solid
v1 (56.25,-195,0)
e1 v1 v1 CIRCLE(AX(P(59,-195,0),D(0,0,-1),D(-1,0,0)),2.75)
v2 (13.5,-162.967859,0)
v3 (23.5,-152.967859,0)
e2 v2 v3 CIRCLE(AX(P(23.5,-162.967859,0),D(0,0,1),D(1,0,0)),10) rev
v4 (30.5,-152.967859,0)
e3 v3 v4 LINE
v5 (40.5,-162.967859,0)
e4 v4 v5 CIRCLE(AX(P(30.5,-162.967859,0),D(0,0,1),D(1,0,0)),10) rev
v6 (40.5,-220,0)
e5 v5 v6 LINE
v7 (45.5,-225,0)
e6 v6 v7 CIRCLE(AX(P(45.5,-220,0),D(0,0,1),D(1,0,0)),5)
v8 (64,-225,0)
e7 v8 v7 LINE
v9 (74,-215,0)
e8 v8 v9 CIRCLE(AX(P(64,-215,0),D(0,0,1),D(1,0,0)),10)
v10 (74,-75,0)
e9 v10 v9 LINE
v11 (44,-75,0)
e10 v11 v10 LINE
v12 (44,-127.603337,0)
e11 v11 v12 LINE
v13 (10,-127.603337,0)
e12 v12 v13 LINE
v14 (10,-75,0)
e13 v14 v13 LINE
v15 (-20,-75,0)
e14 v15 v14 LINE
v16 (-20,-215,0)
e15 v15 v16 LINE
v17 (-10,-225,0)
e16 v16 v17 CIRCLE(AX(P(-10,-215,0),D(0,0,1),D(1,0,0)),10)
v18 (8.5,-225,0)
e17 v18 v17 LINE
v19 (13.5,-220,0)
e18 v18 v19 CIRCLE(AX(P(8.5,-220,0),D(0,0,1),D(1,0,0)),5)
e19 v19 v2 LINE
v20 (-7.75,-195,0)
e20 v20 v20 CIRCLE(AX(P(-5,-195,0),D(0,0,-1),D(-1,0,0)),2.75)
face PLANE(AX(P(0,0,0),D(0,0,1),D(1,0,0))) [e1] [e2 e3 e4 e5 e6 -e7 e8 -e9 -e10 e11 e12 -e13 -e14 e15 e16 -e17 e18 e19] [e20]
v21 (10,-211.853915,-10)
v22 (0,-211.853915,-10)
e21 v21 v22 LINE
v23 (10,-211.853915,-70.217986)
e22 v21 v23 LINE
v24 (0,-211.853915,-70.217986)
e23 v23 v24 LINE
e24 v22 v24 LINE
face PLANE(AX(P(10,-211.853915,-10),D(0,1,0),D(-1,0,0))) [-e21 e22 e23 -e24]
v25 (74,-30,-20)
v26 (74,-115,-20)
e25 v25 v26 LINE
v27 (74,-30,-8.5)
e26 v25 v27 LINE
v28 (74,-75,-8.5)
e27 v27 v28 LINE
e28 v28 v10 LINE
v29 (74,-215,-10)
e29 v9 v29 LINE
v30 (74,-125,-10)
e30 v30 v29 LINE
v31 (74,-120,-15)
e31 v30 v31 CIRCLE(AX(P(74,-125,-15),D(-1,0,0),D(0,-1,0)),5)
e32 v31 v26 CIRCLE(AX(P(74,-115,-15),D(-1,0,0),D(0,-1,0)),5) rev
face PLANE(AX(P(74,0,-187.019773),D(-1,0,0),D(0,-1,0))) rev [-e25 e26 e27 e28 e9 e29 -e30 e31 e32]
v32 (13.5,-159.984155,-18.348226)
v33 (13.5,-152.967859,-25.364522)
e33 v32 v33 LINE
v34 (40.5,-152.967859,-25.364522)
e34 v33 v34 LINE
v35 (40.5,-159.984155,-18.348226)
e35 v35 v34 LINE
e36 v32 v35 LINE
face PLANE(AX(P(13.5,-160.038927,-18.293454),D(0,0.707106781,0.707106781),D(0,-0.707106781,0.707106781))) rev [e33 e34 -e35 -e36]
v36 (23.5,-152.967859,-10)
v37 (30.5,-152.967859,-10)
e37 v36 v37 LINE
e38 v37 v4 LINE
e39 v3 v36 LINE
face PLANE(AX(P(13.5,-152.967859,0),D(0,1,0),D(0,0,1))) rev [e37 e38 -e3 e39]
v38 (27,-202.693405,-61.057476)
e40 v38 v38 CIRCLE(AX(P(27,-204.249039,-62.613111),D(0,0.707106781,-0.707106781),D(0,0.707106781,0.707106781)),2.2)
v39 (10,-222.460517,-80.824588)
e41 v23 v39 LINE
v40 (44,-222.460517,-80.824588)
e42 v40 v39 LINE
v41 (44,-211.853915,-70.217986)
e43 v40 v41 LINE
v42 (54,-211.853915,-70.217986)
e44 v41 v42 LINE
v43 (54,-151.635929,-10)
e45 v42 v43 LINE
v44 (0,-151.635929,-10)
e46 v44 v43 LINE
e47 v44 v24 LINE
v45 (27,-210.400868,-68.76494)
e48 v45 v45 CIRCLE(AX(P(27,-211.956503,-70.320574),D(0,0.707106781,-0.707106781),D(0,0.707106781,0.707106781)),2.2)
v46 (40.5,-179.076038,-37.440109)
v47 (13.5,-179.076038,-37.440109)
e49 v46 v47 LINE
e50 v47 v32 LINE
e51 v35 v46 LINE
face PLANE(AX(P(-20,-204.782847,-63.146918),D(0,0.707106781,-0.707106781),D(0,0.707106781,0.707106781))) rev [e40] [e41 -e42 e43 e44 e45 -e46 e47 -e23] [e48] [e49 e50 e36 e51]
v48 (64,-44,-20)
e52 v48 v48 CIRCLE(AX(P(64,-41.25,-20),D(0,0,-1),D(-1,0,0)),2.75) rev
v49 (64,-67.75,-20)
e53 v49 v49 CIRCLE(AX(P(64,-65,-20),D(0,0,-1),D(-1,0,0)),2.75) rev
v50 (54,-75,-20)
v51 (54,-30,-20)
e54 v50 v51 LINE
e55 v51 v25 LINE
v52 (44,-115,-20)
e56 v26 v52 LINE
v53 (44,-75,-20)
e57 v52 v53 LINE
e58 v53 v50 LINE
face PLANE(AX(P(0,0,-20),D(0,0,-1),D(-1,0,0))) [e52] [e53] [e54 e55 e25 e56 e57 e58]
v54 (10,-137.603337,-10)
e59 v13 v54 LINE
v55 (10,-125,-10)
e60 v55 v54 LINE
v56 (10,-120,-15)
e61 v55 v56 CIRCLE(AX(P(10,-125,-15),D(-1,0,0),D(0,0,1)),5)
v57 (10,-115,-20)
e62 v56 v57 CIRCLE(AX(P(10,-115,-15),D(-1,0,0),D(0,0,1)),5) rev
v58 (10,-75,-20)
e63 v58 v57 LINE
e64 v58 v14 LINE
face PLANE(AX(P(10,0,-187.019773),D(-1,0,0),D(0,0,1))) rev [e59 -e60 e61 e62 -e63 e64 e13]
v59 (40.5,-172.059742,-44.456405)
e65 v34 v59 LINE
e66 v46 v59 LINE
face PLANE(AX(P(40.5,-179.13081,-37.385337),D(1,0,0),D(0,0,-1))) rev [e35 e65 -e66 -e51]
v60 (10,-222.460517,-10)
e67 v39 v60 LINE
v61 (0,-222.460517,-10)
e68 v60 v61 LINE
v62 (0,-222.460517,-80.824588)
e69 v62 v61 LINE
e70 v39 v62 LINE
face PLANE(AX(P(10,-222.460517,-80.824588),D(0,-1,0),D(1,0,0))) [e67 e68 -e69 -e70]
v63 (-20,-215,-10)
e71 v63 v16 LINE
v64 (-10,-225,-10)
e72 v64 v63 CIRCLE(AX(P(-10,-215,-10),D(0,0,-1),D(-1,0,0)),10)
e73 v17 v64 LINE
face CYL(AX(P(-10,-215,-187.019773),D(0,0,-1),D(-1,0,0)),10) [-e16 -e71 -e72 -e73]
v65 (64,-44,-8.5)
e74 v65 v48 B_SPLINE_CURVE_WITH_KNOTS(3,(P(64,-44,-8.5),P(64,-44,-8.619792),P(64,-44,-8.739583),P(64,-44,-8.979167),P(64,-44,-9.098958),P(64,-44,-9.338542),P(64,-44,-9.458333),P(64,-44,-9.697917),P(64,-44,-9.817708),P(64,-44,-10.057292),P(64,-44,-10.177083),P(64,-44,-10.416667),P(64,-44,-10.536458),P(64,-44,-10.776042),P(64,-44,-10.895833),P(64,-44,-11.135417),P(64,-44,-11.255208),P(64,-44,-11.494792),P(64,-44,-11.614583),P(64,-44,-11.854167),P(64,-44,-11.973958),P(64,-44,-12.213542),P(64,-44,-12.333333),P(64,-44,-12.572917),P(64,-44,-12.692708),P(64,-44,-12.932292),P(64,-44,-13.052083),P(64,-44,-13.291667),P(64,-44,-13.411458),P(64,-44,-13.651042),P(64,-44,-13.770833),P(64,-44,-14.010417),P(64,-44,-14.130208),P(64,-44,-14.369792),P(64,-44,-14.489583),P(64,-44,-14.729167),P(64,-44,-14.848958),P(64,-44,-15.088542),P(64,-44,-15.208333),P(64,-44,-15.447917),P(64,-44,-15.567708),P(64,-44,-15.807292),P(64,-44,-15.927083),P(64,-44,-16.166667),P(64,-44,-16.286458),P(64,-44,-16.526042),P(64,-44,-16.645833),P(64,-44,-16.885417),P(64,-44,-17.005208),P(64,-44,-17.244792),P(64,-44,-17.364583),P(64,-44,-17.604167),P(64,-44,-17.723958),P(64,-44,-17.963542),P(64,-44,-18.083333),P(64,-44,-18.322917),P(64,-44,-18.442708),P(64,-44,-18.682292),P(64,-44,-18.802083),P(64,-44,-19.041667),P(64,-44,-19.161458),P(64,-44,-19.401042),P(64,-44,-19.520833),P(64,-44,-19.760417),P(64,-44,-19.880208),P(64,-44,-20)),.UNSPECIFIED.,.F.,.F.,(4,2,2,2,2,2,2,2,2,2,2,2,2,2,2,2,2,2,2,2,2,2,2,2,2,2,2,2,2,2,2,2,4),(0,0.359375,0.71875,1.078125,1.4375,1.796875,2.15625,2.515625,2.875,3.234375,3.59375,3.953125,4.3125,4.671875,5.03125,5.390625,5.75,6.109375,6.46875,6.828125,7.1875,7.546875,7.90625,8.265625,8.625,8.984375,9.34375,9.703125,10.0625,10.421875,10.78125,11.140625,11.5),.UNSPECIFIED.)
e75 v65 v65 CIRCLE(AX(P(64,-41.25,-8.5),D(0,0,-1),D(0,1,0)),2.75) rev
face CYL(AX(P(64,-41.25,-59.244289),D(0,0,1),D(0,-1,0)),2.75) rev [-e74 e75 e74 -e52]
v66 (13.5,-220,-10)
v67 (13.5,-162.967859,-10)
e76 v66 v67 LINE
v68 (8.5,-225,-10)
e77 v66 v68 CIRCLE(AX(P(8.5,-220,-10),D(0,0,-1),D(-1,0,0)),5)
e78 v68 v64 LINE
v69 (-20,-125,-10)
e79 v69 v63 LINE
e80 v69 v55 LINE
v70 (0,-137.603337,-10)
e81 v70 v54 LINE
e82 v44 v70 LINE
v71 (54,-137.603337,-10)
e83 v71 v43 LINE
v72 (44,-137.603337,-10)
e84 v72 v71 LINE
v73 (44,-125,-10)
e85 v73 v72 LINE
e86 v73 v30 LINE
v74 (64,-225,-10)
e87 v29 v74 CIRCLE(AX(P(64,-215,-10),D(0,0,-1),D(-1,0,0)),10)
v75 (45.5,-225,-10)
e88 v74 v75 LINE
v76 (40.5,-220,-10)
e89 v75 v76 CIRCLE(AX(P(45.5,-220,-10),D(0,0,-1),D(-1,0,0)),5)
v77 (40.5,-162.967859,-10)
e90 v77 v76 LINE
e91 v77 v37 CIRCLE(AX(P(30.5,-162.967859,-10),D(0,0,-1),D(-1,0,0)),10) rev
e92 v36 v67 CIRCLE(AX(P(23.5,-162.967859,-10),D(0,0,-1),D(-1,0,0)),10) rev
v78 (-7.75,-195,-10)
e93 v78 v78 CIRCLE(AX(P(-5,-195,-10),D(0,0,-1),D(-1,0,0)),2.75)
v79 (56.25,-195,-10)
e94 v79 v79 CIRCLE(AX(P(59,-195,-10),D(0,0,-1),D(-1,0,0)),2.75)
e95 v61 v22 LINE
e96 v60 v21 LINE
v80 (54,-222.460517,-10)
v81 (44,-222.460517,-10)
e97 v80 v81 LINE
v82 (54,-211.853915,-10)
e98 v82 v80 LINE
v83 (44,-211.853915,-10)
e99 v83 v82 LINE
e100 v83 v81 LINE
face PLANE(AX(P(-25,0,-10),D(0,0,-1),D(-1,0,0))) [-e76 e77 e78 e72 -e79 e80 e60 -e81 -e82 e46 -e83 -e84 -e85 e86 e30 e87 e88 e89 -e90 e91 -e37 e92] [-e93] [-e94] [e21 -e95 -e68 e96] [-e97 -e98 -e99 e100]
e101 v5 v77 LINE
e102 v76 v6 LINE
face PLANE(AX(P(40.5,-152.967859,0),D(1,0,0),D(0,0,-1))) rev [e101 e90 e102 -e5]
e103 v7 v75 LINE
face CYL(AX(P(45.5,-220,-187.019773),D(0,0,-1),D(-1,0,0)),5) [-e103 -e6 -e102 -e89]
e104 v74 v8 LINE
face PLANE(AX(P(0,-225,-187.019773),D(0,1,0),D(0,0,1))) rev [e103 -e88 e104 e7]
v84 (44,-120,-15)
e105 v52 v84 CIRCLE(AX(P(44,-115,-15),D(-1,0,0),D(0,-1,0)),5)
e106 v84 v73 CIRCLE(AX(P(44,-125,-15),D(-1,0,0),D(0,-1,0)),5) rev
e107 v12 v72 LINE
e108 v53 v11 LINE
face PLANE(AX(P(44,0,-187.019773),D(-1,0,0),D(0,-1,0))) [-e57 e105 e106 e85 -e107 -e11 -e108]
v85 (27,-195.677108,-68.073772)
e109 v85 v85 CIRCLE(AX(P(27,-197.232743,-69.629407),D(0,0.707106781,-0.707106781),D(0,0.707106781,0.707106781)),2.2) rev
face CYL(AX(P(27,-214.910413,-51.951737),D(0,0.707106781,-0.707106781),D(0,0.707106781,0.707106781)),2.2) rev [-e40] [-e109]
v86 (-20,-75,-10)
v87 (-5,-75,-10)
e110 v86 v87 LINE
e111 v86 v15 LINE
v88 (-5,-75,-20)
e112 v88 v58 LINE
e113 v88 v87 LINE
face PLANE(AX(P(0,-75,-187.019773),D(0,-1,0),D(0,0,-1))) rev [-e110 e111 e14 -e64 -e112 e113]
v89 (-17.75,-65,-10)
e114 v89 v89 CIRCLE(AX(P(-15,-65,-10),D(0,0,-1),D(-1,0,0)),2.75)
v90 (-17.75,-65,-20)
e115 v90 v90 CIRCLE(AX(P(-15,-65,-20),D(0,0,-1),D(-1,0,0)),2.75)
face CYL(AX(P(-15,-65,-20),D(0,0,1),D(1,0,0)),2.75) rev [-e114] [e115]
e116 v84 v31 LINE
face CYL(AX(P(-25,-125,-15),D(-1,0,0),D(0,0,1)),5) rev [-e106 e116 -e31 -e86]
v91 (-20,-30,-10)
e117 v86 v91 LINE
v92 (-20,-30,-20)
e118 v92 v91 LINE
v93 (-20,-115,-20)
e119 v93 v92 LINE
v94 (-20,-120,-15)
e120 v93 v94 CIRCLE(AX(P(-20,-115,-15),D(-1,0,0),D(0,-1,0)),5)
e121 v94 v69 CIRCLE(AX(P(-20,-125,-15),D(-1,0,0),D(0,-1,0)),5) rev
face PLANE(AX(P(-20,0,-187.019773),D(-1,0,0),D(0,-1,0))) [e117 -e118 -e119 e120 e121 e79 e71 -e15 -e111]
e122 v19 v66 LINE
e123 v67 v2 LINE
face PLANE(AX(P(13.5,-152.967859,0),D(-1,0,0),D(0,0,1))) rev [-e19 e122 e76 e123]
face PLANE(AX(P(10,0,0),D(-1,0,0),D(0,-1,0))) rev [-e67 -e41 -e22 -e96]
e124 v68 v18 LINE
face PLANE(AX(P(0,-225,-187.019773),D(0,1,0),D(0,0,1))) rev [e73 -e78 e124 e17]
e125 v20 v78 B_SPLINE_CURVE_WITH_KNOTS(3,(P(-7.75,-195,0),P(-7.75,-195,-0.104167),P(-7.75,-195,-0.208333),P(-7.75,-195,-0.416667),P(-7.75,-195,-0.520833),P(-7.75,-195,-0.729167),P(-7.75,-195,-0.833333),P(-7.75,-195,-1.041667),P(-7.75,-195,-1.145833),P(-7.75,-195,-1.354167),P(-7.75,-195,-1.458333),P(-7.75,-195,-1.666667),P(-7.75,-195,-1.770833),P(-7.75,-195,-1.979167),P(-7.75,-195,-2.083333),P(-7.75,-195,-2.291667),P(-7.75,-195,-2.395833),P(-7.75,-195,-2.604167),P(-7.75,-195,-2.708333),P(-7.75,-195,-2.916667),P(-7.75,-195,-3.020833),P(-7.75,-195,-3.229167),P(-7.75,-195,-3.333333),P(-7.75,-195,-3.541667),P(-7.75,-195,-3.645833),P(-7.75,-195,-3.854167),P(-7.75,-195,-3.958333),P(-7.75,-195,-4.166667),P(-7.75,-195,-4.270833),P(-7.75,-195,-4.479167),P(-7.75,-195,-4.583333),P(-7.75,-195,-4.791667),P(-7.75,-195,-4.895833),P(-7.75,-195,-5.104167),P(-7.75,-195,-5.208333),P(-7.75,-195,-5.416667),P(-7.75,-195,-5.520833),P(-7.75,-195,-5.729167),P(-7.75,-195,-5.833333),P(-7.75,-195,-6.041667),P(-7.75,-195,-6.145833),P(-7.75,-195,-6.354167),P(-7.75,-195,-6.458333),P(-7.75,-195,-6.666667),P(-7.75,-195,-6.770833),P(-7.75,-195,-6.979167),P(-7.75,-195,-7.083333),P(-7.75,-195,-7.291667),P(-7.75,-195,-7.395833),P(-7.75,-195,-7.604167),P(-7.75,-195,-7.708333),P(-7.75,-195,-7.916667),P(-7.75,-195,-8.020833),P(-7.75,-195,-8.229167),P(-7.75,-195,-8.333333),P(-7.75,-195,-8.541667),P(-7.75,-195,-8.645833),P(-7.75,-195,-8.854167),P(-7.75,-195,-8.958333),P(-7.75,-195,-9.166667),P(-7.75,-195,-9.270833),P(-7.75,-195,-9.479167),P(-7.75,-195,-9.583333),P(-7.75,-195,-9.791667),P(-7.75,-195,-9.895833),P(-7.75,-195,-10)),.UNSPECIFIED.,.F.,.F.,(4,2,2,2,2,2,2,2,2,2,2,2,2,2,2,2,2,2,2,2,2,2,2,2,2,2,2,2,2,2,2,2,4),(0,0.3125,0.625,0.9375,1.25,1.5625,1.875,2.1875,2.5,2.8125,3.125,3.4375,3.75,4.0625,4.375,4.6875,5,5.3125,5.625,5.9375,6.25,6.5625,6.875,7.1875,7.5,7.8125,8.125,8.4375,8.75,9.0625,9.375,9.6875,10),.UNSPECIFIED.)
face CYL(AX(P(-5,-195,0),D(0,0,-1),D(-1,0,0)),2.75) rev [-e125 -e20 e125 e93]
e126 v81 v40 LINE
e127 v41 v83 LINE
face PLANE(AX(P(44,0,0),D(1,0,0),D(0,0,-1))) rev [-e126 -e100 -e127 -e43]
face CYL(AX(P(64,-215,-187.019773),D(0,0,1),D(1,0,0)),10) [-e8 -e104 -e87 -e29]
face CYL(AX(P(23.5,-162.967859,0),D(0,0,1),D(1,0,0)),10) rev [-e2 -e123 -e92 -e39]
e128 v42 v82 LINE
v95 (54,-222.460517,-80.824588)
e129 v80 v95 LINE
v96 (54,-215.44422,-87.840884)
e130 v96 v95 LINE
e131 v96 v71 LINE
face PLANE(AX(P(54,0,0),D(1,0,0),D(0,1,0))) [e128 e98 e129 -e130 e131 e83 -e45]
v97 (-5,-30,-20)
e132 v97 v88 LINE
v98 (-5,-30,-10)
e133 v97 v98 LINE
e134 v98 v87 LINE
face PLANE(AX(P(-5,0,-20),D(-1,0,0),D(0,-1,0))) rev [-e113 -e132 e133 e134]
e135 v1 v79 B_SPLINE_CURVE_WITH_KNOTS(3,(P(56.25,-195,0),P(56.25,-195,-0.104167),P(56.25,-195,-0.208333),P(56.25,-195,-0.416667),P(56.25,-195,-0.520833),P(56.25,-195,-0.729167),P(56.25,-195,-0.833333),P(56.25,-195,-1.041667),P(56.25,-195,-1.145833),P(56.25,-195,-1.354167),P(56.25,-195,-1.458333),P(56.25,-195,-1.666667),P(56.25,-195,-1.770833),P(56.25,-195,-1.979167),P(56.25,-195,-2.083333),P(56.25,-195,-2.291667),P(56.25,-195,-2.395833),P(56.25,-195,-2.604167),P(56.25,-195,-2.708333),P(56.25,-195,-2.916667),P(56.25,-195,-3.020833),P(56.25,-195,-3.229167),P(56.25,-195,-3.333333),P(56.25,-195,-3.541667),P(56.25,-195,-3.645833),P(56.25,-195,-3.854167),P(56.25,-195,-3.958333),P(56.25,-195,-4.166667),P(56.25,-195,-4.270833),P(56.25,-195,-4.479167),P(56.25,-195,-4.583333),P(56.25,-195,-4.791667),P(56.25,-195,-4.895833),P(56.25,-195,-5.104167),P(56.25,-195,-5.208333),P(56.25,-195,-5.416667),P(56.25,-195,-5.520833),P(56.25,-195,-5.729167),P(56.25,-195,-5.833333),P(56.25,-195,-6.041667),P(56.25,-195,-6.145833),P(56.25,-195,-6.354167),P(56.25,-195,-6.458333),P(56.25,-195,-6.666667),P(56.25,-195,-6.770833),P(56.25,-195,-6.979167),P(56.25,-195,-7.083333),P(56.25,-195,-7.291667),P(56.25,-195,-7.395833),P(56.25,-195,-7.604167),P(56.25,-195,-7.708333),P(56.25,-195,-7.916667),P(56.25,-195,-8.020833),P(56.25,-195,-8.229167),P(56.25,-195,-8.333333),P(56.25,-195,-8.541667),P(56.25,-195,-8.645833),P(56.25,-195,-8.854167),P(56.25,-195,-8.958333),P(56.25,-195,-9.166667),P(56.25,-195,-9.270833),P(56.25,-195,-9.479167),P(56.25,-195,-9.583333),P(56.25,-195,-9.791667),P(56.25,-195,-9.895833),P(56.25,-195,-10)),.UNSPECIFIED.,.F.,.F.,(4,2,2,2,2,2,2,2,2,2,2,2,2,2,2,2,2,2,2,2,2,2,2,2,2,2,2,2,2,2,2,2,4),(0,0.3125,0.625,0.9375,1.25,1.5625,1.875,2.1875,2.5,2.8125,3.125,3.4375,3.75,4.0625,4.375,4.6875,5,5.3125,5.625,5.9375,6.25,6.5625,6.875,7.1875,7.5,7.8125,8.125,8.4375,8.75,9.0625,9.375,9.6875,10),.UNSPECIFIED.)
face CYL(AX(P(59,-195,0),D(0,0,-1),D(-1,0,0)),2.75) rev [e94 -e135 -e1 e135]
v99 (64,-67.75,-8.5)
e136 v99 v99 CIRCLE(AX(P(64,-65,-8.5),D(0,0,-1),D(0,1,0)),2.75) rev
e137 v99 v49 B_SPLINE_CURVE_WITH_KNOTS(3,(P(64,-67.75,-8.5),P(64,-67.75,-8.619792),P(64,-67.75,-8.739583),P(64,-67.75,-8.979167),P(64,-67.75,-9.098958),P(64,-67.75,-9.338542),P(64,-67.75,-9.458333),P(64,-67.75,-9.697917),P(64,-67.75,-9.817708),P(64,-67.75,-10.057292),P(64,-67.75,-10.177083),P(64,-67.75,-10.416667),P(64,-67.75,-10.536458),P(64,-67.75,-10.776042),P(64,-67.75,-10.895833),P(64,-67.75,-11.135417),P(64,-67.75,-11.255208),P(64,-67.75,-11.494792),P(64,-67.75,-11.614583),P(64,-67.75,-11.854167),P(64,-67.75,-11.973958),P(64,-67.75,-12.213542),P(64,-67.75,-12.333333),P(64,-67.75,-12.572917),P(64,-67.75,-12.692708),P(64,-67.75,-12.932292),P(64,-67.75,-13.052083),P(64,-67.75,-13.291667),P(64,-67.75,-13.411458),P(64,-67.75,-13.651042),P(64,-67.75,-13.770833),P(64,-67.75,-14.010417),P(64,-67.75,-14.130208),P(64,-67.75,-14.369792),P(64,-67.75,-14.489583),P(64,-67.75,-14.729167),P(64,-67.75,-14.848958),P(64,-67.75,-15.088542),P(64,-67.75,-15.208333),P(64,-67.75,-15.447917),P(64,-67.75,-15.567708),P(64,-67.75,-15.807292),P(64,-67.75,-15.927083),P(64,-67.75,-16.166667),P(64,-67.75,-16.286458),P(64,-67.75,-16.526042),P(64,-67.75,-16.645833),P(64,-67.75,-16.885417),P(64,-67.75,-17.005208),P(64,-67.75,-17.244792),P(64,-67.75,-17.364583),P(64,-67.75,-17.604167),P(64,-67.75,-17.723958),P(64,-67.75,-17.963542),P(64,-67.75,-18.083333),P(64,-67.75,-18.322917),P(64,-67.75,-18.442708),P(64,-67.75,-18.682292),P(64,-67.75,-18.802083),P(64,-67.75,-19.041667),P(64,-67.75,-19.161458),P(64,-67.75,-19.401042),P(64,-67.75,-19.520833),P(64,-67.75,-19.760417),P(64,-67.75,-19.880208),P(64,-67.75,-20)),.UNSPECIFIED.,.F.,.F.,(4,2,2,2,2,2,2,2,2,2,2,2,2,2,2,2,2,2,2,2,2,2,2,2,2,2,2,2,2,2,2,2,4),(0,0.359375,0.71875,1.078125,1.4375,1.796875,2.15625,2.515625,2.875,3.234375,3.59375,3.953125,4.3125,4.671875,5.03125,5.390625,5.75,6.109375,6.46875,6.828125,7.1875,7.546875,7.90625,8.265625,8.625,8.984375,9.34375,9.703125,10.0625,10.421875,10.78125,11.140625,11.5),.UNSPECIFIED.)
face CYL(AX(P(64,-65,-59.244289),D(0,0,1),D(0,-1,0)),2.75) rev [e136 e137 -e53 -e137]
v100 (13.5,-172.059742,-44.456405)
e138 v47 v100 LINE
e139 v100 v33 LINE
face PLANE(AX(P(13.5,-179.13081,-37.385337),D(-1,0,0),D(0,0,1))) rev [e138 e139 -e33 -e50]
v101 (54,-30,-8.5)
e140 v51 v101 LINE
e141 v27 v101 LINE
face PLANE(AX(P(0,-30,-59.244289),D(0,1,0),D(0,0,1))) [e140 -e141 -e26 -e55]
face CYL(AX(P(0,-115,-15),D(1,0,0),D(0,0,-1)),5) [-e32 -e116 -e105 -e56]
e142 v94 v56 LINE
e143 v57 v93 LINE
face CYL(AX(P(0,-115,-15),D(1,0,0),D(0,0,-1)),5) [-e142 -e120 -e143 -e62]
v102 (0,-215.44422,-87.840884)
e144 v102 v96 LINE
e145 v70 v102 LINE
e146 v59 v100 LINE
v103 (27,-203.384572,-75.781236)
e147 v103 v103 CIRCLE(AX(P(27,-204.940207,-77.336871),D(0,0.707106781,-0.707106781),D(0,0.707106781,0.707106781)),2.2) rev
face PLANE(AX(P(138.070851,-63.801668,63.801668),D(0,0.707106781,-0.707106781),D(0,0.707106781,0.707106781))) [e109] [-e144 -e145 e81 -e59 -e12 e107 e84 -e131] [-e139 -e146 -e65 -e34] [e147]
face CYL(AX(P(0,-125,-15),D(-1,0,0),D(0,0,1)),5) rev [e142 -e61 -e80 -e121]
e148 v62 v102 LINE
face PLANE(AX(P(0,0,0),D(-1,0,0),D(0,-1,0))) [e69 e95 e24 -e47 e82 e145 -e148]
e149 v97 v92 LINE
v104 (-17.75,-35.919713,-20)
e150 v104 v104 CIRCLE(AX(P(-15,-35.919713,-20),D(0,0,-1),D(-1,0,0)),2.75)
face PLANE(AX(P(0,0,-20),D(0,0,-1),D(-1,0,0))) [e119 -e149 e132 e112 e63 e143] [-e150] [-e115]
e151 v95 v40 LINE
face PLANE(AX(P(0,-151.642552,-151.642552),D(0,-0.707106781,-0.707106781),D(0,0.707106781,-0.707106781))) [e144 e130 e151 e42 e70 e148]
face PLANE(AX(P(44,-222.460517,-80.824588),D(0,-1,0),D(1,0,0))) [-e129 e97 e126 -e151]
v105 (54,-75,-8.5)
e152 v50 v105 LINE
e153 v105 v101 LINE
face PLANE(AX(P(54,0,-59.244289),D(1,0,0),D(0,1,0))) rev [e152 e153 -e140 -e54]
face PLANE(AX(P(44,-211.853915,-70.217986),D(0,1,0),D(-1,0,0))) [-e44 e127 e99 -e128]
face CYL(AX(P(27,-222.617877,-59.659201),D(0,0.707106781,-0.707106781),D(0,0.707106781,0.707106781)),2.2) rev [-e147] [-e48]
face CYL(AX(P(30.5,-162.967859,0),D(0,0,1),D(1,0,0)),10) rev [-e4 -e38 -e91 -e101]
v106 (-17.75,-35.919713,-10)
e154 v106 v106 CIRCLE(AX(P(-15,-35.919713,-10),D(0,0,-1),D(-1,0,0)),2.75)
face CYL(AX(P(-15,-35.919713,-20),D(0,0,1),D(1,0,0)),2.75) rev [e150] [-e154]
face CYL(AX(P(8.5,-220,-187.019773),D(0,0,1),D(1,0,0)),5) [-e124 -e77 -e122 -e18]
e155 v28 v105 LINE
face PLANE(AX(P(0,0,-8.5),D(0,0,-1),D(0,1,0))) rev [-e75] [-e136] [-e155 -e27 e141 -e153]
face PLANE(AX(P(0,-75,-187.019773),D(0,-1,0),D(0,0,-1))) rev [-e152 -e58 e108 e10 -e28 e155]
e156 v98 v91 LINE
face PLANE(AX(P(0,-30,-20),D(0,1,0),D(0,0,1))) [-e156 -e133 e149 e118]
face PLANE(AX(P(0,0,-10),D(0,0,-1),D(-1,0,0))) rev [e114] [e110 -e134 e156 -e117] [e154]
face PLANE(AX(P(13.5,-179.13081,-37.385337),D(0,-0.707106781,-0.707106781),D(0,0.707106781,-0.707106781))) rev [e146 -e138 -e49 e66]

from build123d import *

# Parameters (mm, degrees)
SKETCH2_W               = 34
SKETCH2_H               = 20
SKETCH2_W_2             = 30
SKETCH2_H_2             = 150
BOSS_EXTRUDE1_DEPTH     = 10
SKETCH3_W               = 20
SKETCH3_H               = 45
SKETCH3_R               = 2.75
BOSS_EXTRUDE2_DEPTH     = 1.5
SKETCH4_W               = 15
SKETCH4_H               = 45
SKETCH4_R               = 2.75
BOSS_EXTRUDE3_DEPTH     = 10
SKETCH5_R               = 2.75
BOSS_EXTRUDE4_DEPTH     = 10
FILLET1_R               = 5
SKETCH6_W               = 34
SKETCH6_H               = 10
BOSS_EXTRUDE5_DEPTH     = 70
BOSS_EXTRUDE6_REACH     = 246.665
CUT_EXTRUDE1_DEPTH      = 34
FILLET2_R               = 5
CUT_EXTRUDE2_START      = -20
CUT_EXTRUDE2_DEPTH      = 20
CUT_EXTRUDE3_DEPTH      = 20
BOSS_EXTRUDE7_DEPTH     = 54
CUT_EXTRUDE4_DEPTH      = 240.922546822
CUT_EXTRUDE4_DEPTH_BACK = 240.922546822
CUT_EXTRUDE5_DEPTH      = 240.922546822
CUT_EXTRUDE5_DEPTH_BACK = 240.922546822
BOSS_EXTRUDE8_DEPTH     = 54
CUT_EXTRUDE6_DEPTH      = 248.030112784
CUT_EXTRUDE6_DEPTH_BACK = 248.030112784
SKETCH18_R              = 2.2
CUT_EXTRUDE7_DEPTH      = 9.92254106
SKETCH20_W              = 54
SKETCH20_H              = 9.922541059
BOSS_EXTRUDE9_DEPTH     = 25
SKETCH21_R              = 2.2
CUT_EXTRUDE8_DEPTH      = 25
BOSS_EXTRUDE10_START    = 13
SKETCH22_R              = 2.2
BOSS_EXTRUDE10_DEPTH    = 13
SKETCH23_W              = 13
SKETCH23_H              = 77.7
CUT_EXTRUDE10_DEPTH     = 13
SKETCH24_W              = 27
SKETCH24_H              = 27
CUT_EXTRUDE11_DEPTH     = 10
CUT_EXTRUDE12_DEPTH     = 10
BOSS_EXTRUDE11_DEPTH    = 10
BOSS_EXTRUDE12_DEPTH    = 10
FILLET3_R               = 10
FILLET4_R               = 5
FILLET5_R               = 10
CUT_EXTRUDE14_DEPTH     = 250.319480135


with BuildPart() as part:
    # Sketch2 → Boss-Extrude1 (new body)
    with BuildSketch(Plane.XY):
        Polygon((10, -225), (10, -205), (10, -75), (-20, -75), (-20, -225), align=None)
        with Locations((27, -215)):
            Rectangle(SKETCH2_W, SKETCH2_H)
        with Locations((59, -150)):
            Rectangle(SKETCH2_W_2, SKETCH2_H_2)
    extrude(amount=-BOSS_EXTRUDE1_DEPTH)

    # Sketch3 → Boss-Extrude2 (add)
    with BuildSketch(Plane(origin=(0, 0, -8.5), x_dir=(-1, 0, 0), z_dir=(0, 0, -1))):
        with Locations((-64, -52.5)):
            Rectangle(SKETCH3_W, SKETCH3_H)
        with Locations((-64, -65)):
            Circle(SKETCH3_R, mode=Mode.SUBTRACT)
        with Locations((-64, -41.25)):
            Circle(SKETCH3_R, mode=Mode.SUBTRACT)
    extrude(amount=BOSS_EXTRUDE2_DEPTH)

    # Sketch4 → Boss-Extrude3 (add)
    # profile 1 of 2: a face of its own
    with BuildSketch(Plane(origin=(0, 0, -10), x_dir=(-1, 0, 0), z_dir=(0, 0, -1))):
        Polygon((20, -75), (5, -75), (-10, -75), (-10, -120), (20, -120), align=None)
    # profile 2 of 2: a face of its own
    with BuildSketch(Plane(origin=(0, 0, -10), x_dir=(-1, 0, 0), z_dir=(0, 0, -1))):
        with Locations((12.5, -52.5)):
            Rectangle(SKETCH4_W, SKETCH4_H)
        with Locations((15, -65)):
            Circle(SKETCH4_R, mode=Mode.SUBTRACT)
        with Locations((15, -35.919713403)):
            Circle(SKETCH4_R, mode=Mode.SUBTRACT)
    extrude(amount=BOSS_EXTRUDE3_DEPTH)

    # Sketch5 → Boss-Extrude4 (add)
    with BuildSketch(Plane(origin=(0, 0, -10), x_dir=(-1, 0, 0), z_dir=(0, 0, -1))):
        Polygon((-74, -120), (-44, -120), (-44, -75), (-54, -75), (-54, -30), (-74, -30), align=None)
        with Locations(Location((-64, -65, 0), (0, 0, 270))):
            Circle(SKETCH5_R, mode=Mode.SUBTRACT)
        with Locations(Location((-64, -41.25, 0), (0, 0, 270))):
            Circle(SKETCH5_R, mode=Mode.SUBTRACT)
    extrude(amount=BOSS_EXTRUDE4_DEPTH)

    # Fillet1
    fillet1_edges = [part.edges().sort_by_distance(p)[0] for p in [
        (59, -120, -10),
        (-5, -120, -10),
    ]]
    fillet(fillet1_edges, radius=FILLET1_R)
    fillet1_2_edges = [part.edges().sort_by_distance(p)[0] for p in [
        (59, -120, -20),
        (-5, -120, -20),
    ]]
    fillet(fillet1_2_edges, radius=FILLET1_R - 0.0001)  # a hair under: the kernel refuses the full size

    # Sketch6 → Boss-Extrude5 (add)
    with BuildSketch(Plane(origin=(0, -205, 0), x_dir=(1, 0, 0), z_dir=(0, 1, 0))):
        with Locations((27, 5)):
            Rectangle(SKETCH6_W, SKETCH6_H)
    extrude(amount=BOSS_EXTRUDE5_DEPTH)

    # Boss-Extrude6: up to this face of the body (flat: up to its plane)
    boss_extrude6_end = Plane(part.part.faces().sort_by_distance((74, -119.982060157, -8.746792457))[0])
    # Sketch7 → Boss-Extrude6 (add, up to the picked face)
    with BuildSketch(Plane.ZY.offset(20), mode=Mode.PRIVATE) as boss_extrude6_sk1:
        Polygon((-10, -137.603336753), (-34.698331624, -162.301668376), (-45.304933341, -172.908270094), (-10, -172.908270094), align=None)
    boss_extrude6_tool1 = split(extrude(boss_extrude6_sk1.sketch, amount=-BOSS_EXTRUDE6_REACH, mode=Mode.PRIVATE), bisect_by=boss_extrude6_end, keep=Keep.BOTH, mode=Mode.PRIVATE)
    # Sketch7 → Boss-Extrude6 (add, up to the picked face)
    with BuildSketch(Plane.ZY.offset(20), mode=Mode.PRIVATE) as boss_extrude6_sk2:
        Polygon((0, -127.603336753), (-10, -137.603336753), (-10, -172.908270094), (0, -172.908270094), align=None)
    boss_extrude6_tool2 = split(extrude(boss_extrude6_sk2.sketch, amount=-BOSS_EXTRUDE6_REACH, mode=Mode.PRIVATE), bisect_by=boss_extrude6_end, keep=Keep.BOTH, mode=Mode.PRIVATE)
    add(boss_extrude6_tool1.solids().sort_by(Axis((-20, -161.139959, -21.768311), (1, 0, 0)))[0])
    add(boss_extrude6_tool2.solids().sort_by(Axis((-20, -152.652425, -4.793243), (1, 0, 0)))[0])

    # Sketch8 → Cut-Extrude1 (cut)
    with BuildSketch(Plane.ZY.offset(-44)):
        Polygon((-7.396663247, -135), (-10.086941063, -137.690277816), (-10, -135), align=None)
    extrude(amount=CUT_EXTRUDE1_DEPTH, mode=Mode.SUBTRACT)

    # Fillet2
    fillet2_edges = [part.edges().sort_by_distance(p)[0] for p in [
        (27, -172.908270094, -45.304933341),
    ]]
    fillet(fillet2_edges, radius=FILLET2_R)

    # Sketch9 → Cut-Extrude2 (cut)
    with BuildSketch(Plane.ZY.offset(20).offset(CUT_EXTRUDE2_START)):
        with BuildLine():
            Line((-10, -172.908270094), (-10, -137.603336753))
            Line((-10, -137.603336753), (-36.769399436, -164.372736188))
            ThreePointArc((-36.769399436, -164.372736188), (-37.853263192, -169.821687256), (-33.23386553, -172.908270094))
            Line((-33.23386553, -172.908270094), (-10, -172.908270094))
        make_face()
    extrude(amount=CUT_EXTRUDE2_DEPTH, mode=Mode.SUBTRACT)

    # Sketch10 → Cut-Extrude3 (cut)
    with BuildSketch(Plane(origin=(74, 0, 0), x_dir=(0, 0, -1), z_dir=(1, 0, 0))):
        with BuildLine():
            Line((10, -137.603336753), (10, -172.908270094))
            Line((10, -172.908270094), (33.23386553, -172.908270094))
            ThreePointArc((33.23386553, -172.908270094), (37.853263192, -169.821687256), (36.769399436, -164.372736188))
            Line((36.769399436, -164.372736188), (10, -137.603336753))
        make_face()
    extrude(amount=-CUT_EXTRUDE3_DEPTH, mode=Mode.SUBTRACT)

    # Sketch12 → Boss-Extrude7 (add)
    with BuildSketch(Plane.ZY):
        Polygon((-10, -137.603336753), (22.716423027, -106.706157847), (36.44850254, -121.246790303), (-10, -165.112456538), align=None)
    extrude(amount=-BOSS_EXTRUDE7_DEPTH)

    # Sketch13 → Cut-Extrude4 (cut, two sides: drawn at the far end of the back side and taken through both)
    with BuildSketch(Plane(origin=(54, 0, 0), x_dir=(0, 0, -1), z_dir=(1, 0, 0)).offset(-CUT_EXTRUDE4_DEPTH_BACK)):
        Polygon((17.239749062, -172.908270094), (10, -165.668521032), (10, -172.908270094), align=None)
    extrude(amount=CUT_EXTRUDE4_DEPTH + CUT_EXTRUDE4_DEPTH_BACK, mode=Mode.SUBTRACT)

    # Sketch14 → Cut-Extrude5 (cut, two sides: drawn at the far end of the back side and taken through both)
    with BuildSketch(Plane(origin=(54, 0, 0), x_dir=(0, 0, -1), z_dir=(1, 0, 0)).offset(-CUT_EXTRUDE5_DEPTH_BACK)):
        Polygon((-36.44850254, -121.246790303), (0, -155.668521032), (0, -128.159401246), (-22.716423027, -106.706157847), align=None)
    extrude(amount=CUT_EXTRUDE5_DEPTH + CUT_EXTRUDE5_DEPTH_BACK, mode=Mode.SUBTRACT)

    # Sketch15 → Boss-Extrude8 (add)
    with BuildSketch(Plane(origin=(54, 0, 0), x_dir=(0, 0, -1), z_dir=(1, 0, 0))):
        with BuildLine():
            Line((17.239749062, -172.908270094), (56.130622027, -211.799143059))
            Line((56.130622027, -211.799143059), (70.163214167, -197.76655092))
            Line((70.163214167, -197.76655092), (36.769399436, -164.372736188))
            ThreePointArc((36.769399436, -164.372736188), (37.853263192, -169.821687256), (33.23386553, -172.908270094))
            Line((33.23386553, -172.908270094), (17.239749062, -172.908270094))
        make_face()
    extrude(amount=-BOSS_EXTRUDE8_DEPTH)

    # Sketch16 → Cut-Extrude6 (cut, two sides: drawn at the far end of the back side and taken through both)
    with BuildSketch(Plane(origin=(54, 0, 0), x_dir=(0, 0, -1), z_dir=(1, 0, 0)).offset(-CUT_EXTRUDE6_DEPTH_BACK)):
        Polygon((63.146918097, -204.78284699), (10, -151.635928892), (10, -165.668521032), (56.130622027, -211.799143059), align=None)
    extrude(amount=CUT_EXTRUDE6_DEPTH + CUT_EXTRUDE6_DEPTH_BACK, mode=Mode.SUBTRACT)

    # Sketch18 → Cut-Extrude7 (cut)
    with BuildSketch(Plane(origin=(0, -63.801668376, 63.801668376), x_dir=(1, 0, 0), z_dir=(0, 0.707106781186546, -0.7071067811865491))):
        with Locations(Location((27, 144.300035894, 0), (0, 0, 270))):
            Circle(SKETCH18_R)
        with Locations(Location((27, 134.300035894, 0), (0, 0, 270))):
            Circle(SKETCH18_R)
    extrude(amount=-CUT_EXTRUDE7_DEPTH, mode=Mode.SUBTRACT)

    # Sketch20 → Boss-Extrude9 (add)
    with BuildSketch(Plane(origin=(0, -133.964882543, -133.964882543), x_dir=(1, 0, 0), z_dir=(0, -0.707106781186548, -0.7071067811865471))):
        with Locations((27, 95.19045525)):
            Rectangle(SKETCH20_W, SKETCH20_H)
    extrude(amount=BOSS_EXTRUDE9_DEPTH)

    # Sketch21 → Cut-Extrude8 (cut)
    with BuildSketch(Plane(origin=(0, -63.801668376, 63.801668376), x_dir=(1, 0, 0), z_dir=(0, 0.707106781186546, -0.7071067811865491))):
        with Locations(Location((27, 199.600035894, 0), (0, 0, 270))):
            Circle(SKETCH21_R)
        with Locations(Location((27, 188.700035894, 0), (0, 0, 270))):
            Circle(SKETCH21_R)
    extrude(amount=-CUT_EXTRUDE8_DEPTH, mode=Mode.SUBTRACT)

    # Sketch22 → Boss-Extrude10 (add)
    with BuildSketch(Plane(origin=(0, -63.801668376, 63.801668376), x_dir=(1, 0, 0), z_dir=(0, 0.707106781186546, -0.7071067811865491)).offset(BOSS_EXTRUDE10_START)):
        Polygon((33.5, 205.800035894), (27, 205.800035894), (20.5, 205.800035894), (20.5, 128.100035894), (27, 128.100035894), (33.5, 128.100035894), align=None)
        with BuildLine():
            ThreePointArc((29.2, 134.300035894), (28.555634919, 132.744400975), (27, 132.100035894))
            ThreePointArc((27, 132.100035894), (25.444365081, 135.855670812), (29.2, 134.300035894))
        make_face(mode=Mode.SUBTRACT)
        with Locations((27, 144.300035894)):
            Circle(SKETCH22_R, mode=Mode.SUBTRACT)
        with Locations((27, 188.700035894)):
            Circle(SKETCH22_R, mode=Mode.SUBTRACT)
        with BuildLine():
            ThreePointArc((29.2, 199.600035894), (25.444365081, 198.044400975), (27, 201.800035894))
            ThreePointArc((27, 201.800035894), (28.555634919, 201.155670812), (29.2, 199.600035894))
        make_face(mode=Mode.SUBTRACT)
    extrude(amount=-BOSS_EXTRUDE10_DEPTH)

    # Sketch23 → Cut-Extrude10 (cut)
    with BuildSketch(Plane(origin=(0, -54.609280221, 54.609280221), x_dir=(1, 0, 0), z_dir=(0, 0.707106781186546, -0.707106781186549))):
        with Locations((27, 166.950035894)):
            Rectangle(SKETCH23_W, SKETCH23_H)
    extrude(amount=-CUT_EXTRUDE10_DEPTH, mode=Mode.SUBTRACT)

    # Sketch24 → Cut-Extrude11 (cut)
    with BuildSketch(Plane(origin=(0, -63.801668376, 63.801668376), x_dir=(1, 0, 0), z_dir=(0, 0.707106781186546, -0.7071067811865491))):
        with Locations((27, 139.600035894)):
            Rectangle(SKETCH24_W, SKETCH24_H)
    extrude(amount=-CUT_EXTRUDE11_DEPTH, mode=Mode.SUBTRACT)

    # Sketch25 → Cut-Extrude12 (cut)
    with BuildSketch(Plane(origin=(0, 0, -10), x_dir=(-1, 0, 0), z_dir=(0, 0, -1))):
        Polygon((-40.5, -152.967858865), (-40.5, -233.312040373), (-13.5, -234.023370682), (-13.5, -152.967858865), align=None)
    extrude(amount=-CUT_EXTRUDE12_DEPTH, mode=Mode.SUBTRACT)

    # Sketch26 → Boss-Extrude11 (add)
    with BuildSketch(Plane(origin=(54, 0, 0), x_dir=(0, 0, -1), z_dir=(1, 0, 0))):
        Polygon((80.824587627, -222.460516519), (6.638247164, -222.460516519), (3.697137503, -222.460516519), (3.697137503, -211.853914801), (70.217985909, -211.853914801), align=None)
    extrude(amount=-BOSS_EXTRUDE11_DEPTH)

    # Sketch27 → Boss-Extrude12 (add)
    with BuildSketch(Plane.ZY):
        Polygon((-10, -222.460516519), (-10, -211.853914801), (-70.217985909, -211.853914801), (-80.824587627, -222.460516519), align=None)
    extrude(amount=-BOSS_EXTRUDE12_DEPTH)

    # Fillet3
    fillet3_edges = [part.edges().sort_by_distance(p)[0] for p in [
        (-20, -225, -5),
        (74, -225, -5),
    ]]
    fillet(fillet3_edges, radius=FILLET3_R)

    # Fillet4
    fillet4_edges = [part.edges().sort_by_distance(p)[0] for p in [
        (13.5, -225, -5),
        (40.5, -225, -5),
    ]]
    fillet(fillet4_edges, radius=FILLET4_R)

    # Fillet5
    fillet5_edges = [part.edges().sort_by_distance(p)[0] for p in [
        (13.5, -152.967858865, -5),
        (40.5, -152.967858865, -5),
    ]]
    fillet(fillet5_edges, radius=FILLET5_R)

    # Sketch28 → Cut-Extrude14 (cut, through all)
    with BuildSketch(Plane(origin=(0, 0, -10), x_dir=(-1, 0, 0), z_dir=(0, 0, -1))):
        with BuildLine():
            Line((-61.75, -195), (-59, -195))
            Line((-59, -195), (-56.25, -195))
            ThreePointArc((-56.25, -195), (-59, -192.25), (-61.75, -195))
        make_face()
        with BuildLine():
            Line((-56.25, -195), (-59, -195))
            Line((-59, -195), (-61.75, -195))
            ThreePointArc((-61.75, -195), (-59, -197.75), (-56.25, -195))
        make_face()
        with BuildLine():
            ThreePointArc((7.75, -195), (5, -192.25), (2.25, -195))
            Line((2.25, -195), (5, -195))
            Line((5, -195), (7.75, -195))
        make_face()
        with BuildLine():
            Line((5, -195), (2.25, -195))
            ThreePointArc((2.25, -195), (5, -197.75), (7.75, -195))
            Line((7.75, -195), (5, -195))
        make_face()
    extrude(amount=-CUT_EXTRUDE14_DEPTH, mode=Mode.SUBTRACT)


solid = part.part
